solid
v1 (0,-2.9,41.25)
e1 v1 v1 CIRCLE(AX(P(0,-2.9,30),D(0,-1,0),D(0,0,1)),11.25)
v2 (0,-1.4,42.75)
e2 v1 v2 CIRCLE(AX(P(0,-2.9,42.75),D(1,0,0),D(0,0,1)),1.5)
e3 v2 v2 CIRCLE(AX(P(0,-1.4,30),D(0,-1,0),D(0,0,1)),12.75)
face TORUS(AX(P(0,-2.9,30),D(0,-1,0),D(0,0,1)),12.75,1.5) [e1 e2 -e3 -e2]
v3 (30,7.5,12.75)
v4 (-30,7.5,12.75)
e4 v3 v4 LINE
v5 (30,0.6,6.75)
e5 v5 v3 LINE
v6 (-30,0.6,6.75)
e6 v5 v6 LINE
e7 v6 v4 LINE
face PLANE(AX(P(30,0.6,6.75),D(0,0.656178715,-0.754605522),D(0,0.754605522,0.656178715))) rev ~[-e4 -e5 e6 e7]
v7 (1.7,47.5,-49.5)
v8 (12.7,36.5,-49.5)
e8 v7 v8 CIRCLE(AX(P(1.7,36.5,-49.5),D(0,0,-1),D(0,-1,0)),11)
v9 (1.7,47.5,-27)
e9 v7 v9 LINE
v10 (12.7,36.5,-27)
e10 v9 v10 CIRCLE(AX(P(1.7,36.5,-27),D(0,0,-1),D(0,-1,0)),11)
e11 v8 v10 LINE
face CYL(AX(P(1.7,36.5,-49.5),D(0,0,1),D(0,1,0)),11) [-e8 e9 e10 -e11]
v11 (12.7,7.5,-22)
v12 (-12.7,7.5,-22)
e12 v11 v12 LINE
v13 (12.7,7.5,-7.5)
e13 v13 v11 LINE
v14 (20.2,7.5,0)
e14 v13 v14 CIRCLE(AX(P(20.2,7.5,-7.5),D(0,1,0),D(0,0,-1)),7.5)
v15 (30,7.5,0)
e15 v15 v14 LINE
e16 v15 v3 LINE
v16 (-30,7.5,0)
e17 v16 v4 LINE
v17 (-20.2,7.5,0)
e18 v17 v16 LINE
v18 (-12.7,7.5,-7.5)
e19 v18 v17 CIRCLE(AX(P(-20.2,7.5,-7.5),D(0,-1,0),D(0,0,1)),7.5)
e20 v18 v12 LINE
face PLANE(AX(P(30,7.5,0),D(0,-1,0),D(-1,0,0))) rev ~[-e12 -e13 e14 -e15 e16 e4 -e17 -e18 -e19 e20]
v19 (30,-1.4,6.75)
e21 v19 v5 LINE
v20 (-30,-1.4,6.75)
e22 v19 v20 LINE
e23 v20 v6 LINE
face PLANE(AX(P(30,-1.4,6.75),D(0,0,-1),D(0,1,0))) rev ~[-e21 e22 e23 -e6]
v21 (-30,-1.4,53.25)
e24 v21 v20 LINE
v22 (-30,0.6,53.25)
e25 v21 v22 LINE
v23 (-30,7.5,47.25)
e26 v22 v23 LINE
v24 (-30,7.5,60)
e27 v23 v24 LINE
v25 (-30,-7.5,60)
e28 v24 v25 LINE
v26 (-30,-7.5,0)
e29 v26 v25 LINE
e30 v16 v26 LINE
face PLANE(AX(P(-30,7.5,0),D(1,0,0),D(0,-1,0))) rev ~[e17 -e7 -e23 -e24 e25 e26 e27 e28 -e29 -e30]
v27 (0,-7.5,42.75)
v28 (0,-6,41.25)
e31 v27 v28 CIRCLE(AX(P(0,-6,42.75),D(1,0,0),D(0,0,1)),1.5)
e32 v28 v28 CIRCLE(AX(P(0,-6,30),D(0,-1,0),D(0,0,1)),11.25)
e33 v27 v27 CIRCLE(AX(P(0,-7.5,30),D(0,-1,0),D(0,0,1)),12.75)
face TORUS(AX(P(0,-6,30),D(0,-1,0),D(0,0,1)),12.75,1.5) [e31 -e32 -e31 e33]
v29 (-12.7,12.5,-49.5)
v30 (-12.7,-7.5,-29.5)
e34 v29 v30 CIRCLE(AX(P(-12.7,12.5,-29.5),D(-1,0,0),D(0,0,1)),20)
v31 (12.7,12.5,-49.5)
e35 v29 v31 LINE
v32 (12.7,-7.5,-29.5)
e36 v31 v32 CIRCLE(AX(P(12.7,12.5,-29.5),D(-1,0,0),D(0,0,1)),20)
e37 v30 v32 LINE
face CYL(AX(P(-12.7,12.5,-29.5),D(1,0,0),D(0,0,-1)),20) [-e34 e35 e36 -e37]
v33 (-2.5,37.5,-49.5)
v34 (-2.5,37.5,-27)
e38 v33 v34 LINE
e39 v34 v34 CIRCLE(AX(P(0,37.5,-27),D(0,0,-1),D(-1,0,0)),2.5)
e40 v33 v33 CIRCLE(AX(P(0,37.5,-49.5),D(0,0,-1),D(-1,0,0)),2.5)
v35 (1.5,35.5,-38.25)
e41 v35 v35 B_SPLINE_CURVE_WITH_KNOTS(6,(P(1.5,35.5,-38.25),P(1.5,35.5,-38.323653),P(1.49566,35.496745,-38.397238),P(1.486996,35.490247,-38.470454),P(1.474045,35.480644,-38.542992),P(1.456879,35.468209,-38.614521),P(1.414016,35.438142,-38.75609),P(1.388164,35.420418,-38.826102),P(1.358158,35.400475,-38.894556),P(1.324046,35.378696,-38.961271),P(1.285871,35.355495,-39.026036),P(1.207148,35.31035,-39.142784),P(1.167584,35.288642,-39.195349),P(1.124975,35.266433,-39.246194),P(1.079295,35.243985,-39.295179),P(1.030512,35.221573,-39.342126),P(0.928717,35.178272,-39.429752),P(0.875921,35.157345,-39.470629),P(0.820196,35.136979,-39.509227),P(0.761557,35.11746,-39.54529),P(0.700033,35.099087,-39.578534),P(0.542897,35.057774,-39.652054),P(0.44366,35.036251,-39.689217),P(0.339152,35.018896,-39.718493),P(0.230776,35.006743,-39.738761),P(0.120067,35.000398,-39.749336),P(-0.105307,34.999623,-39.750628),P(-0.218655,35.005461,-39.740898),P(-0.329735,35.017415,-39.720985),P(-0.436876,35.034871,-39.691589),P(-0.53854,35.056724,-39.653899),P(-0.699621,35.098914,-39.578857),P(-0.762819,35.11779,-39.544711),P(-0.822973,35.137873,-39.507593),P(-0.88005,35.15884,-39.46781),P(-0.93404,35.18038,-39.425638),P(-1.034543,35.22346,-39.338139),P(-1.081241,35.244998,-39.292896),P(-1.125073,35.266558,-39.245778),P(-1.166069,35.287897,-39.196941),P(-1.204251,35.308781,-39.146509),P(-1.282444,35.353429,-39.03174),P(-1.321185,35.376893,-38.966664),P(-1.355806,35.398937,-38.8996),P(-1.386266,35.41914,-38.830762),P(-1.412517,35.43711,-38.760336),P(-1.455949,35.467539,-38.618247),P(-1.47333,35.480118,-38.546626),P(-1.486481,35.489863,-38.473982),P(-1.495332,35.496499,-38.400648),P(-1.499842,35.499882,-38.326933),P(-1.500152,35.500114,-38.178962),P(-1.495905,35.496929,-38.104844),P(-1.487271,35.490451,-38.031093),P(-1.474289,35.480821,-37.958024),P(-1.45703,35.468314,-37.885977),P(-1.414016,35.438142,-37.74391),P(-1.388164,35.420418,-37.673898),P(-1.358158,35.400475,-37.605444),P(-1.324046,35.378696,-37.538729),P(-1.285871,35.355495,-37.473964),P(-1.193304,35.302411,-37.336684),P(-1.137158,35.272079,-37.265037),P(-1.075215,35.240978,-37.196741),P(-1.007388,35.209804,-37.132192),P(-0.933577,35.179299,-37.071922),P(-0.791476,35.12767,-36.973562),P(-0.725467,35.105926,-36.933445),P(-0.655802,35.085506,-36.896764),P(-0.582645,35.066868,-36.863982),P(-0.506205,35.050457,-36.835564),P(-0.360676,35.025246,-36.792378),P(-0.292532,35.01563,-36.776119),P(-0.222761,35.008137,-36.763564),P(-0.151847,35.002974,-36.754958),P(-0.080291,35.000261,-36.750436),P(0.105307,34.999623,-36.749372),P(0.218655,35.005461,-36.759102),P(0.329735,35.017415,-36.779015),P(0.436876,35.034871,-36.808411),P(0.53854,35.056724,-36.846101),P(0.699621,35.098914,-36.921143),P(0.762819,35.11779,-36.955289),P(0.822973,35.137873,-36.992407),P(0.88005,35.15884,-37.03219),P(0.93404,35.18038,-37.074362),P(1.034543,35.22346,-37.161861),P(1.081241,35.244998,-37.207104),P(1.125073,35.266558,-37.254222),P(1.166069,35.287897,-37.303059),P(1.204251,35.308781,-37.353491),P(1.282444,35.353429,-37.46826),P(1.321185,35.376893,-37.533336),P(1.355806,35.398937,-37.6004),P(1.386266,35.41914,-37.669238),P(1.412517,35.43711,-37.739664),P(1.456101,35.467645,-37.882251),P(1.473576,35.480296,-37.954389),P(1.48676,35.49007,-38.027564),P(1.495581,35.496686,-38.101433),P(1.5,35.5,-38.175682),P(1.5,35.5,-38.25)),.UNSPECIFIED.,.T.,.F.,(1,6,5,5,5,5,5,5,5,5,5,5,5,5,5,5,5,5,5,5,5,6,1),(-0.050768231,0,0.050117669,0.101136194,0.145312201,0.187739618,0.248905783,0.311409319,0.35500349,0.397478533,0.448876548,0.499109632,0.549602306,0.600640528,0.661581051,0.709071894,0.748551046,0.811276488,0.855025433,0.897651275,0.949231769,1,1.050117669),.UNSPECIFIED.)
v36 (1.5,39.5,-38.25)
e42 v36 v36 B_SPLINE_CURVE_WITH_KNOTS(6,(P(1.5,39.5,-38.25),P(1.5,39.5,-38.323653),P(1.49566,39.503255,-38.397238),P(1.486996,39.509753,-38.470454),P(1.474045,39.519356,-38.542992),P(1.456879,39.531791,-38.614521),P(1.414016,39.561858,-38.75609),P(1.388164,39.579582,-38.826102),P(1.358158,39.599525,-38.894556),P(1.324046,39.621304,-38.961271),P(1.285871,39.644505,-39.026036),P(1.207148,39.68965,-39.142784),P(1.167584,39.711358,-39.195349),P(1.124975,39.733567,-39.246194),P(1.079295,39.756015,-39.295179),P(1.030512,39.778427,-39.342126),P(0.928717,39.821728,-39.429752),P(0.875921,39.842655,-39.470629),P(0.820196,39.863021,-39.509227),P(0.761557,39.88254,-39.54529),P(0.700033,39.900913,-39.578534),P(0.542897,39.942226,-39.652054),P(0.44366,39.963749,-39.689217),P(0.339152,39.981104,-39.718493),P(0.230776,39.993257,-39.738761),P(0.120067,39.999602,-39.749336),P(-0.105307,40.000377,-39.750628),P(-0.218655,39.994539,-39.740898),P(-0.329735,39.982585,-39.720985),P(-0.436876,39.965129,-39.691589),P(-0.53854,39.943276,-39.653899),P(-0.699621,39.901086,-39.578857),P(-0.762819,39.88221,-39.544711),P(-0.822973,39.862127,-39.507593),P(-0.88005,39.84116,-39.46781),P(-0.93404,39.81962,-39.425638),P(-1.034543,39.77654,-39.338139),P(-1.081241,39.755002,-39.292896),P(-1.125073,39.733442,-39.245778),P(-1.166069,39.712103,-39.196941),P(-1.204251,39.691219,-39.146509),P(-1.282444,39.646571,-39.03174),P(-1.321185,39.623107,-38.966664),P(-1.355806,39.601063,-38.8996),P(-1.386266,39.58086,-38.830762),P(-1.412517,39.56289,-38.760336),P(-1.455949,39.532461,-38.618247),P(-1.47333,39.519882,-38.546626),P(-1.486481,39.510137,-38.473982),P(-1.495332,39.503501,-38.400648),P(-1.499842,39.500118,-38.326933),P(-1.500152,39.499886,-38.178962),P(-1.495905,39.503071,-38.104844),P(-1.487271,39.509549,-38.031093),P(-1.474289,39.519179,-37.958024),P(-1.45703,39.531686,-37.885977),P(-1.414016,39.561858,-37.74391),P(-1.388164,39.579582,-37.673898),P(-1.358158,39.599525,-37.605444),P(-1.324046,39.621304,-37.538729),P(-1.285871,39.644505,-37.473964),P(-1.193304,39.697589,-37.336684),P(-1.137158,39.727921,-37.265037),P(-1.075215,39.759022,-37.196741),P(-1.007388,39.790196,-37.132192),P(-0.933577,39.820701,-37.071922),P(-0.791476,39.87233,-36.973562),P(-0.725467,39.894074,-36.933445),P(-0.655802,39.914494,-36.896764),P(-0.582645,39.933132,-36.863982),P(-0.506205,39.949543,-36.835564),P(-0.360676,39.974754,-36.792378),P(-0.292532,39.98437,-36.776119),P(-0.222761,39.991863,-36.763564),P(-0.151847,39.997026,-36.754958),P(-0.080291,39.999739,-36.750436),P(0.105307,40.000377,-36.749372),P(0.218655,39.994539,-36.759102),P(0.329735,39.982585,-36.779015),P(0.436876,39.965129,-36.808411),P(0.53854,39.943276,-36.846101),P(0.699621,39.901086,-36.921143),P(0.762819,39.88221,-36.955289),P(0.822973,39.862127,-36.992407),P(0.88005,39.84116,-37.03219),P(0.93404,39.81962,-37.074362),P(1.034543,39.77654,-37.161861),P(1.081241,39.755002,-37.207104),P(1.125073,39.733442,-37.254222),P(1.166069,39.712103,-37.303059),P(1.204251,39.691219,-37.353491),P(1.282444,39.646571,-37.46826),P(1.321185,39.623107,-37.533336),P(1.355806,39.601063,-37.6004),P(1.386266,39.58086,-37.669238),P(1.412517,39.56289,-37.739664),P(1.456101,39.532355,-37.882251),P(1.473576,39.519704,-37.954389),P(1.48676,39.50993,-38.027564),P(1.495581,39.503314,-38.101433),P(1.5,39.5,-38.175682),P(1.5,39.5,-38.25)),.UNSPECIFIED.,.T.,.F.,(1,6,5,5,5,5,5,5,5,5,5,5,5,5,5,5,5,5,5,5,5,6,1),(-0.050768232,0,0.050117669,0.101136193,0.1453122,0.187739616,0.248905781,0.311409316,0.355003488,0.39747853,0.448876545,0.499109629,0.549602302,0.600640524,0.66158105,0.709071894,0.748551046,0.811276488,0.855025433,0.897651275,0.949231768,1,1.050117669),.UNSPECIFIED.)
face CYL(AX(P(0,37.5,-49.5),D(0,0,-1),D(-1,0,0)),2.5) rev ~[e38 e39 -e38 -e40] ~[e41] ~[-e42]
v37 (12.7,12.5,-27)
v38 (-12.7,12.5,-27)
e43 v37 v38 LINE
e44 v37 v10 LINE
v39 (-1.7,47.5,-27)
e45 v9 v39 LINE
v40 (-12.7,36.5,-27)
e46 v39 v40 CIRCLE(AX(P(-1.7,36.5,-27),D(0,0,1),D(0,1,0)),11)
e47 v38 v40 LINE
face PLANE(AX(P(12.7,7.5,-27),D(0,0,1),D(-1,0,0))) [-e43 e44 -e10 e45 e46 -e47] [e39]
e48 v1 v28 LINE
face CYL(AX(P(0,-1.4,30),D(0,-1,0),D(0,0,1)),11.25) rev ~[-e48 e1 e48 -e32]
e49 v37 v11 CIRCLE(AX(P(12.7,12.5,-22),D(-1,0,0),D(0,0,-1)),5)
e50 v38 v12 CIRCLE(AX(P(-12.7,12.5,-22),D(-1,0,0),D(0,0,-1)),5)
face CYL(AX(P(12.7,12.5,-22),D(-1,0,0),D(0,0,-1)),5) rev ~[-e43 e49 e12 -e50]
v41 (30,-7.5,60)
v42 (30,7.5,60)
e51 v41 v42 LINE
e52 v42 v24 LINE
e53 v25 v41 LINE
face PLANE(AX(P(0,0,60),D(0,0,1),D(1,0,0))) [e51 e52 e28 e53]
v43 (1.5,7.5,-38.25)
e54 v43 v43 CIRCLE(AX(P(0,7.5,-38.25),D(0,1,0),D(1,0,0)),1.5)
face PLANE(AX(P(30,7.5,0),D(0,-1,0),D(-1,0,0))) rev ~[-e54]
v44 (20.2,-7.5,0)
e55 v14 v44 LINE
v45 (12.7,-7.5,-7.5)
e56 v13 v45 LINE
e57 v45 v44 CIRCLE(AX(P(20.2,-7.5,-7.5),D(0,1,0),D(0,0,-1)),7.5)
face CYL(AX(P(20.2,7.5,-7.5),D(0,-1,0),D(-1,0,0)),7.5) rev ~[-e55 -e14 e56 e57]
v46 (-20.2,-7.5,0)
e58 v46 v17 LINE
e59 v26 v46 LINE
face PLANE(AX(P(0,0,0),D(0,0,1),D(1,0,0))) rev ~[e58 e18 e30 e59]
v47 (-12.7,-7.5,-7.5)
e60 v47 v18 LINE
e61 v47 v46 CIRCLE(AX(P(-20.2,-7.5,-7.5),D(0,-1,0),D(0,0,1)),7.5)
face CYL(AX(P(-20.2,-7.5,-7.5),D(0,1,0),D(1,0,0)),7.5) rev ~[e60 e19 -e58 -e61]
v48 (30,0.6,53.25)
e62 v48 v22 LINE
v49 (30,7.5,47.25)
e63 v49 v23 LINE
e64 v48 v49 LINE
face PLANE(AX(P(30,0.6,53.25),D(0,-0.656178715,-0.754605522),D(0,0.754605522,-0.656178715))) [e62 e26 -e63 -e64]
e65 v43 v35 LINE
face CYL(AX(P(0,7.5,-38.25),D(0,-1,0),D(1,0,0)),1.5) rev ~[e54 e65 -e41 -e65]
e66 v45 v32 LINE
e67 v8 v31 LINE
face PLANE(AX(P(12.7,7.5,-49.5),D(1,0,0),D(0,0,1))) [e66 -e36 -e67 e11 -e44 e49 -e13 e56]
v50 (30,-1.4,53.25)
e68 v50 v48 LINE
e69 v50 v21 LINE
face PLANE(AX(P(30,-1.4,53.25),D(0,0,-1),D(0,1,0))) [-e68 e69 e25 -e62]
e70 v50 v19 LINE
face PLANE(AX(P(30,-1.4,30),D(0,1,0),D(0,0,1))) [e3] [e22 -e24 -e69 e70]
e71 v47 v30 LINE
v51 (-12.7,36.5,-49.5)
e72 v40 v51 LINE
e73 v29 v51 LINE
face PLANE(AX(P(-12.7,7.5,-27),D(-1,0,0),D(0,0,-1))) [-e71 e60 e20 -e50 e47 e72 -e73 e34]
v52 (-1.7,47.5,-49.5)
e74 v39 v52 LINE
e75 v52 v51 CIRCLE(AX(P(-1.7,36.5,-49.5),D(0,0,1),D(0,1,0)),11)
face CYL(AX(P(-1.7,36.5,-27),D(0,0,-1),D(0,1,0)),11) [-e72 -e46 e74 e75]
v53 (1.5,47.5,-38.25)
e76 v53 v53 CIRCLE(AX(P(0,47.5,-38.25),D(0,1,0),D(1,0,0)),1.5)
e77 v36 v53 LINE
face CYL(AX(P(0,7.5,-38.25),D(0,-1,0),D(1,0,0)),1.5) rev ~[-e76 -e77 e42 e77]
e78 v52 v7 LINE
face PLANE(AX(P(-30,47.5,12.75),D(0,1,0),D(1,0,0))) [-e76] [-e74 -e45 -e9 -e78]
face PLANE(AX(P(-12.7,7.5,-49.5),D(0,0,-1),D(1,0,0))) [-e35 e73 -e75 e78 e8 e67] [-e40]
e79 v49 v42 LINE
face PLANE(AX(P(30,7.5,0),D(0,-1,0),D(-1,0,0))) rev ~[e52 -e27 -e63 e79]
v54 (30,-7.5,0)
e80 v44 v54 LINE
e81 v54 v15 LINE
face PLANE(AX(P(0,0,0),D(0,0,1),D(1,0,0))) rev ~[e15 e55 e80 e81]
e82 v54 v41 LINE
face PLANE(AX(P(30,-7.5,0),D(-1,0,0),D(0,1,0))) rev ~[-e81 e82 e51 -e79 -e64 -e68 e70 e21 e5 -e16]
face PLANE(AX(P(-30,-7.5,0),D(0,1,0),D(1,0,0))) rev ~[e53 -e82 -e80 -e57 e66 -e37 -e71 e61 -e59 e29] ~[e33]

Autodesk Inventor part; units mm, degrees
ref_plane "YZ Plane" through (0, 0, 0) normal (1, 0, 0) x (0, 1, 0)
ref_plane "XZ Plane" through (0, 0, 0) normal (0, 1, 0) x (-1, 0, 0)
ref_plane "XY Plane" through (0, 0, 0) normal (0, 0, 1) x (1, 0, 0)
sketch "Sketch1" plane through (0, 0, 0) normal (0, 0, 1) x (1, 0, 0)
  line L0 (-30, -7.5) -> (30, -7.5)
  line L1 (30, -7.5) -> (30, 7.5)
  line L2 (30, 7.5) -> (-30, 7.5)
  line L3 (-30, 7.5) -> (-30, -7.5)
  line L4 (-30, -7.5) -> (30, 7.5) construction
  line L5 (30, -7.5) -> (-30, 7.5) construction
  line L6 (30, 7.5) -> (25, 7.5) construction
  line L7 (-30, 7.5) -> (-25, 7.5) construction
  point P0 (0, 0)
  dimension "d0" = 60
  dimension "d1" = 15
extrude "Block" add sketch "Sketch1" along normal blind 60
sketch "Sketch2" plane through (30, -7.5, 0) normal (1, 0, 0) x (0, 0, -1)
  line L0 (0, 15) -> (-60, 15) projected
  line L1 (-30, 15) -> (-12.75, 15)
  line L2 (-30, 15) -> (-47.25, 15)
  line L3 (-30, 15) -> (-30, 6.1) construction
  line L4 (-30, 6.1) -> (-6.75, 6.1)
  line L5 (-30, 6.1) -> (-53.25, 6.1)
  line L6 (-53.25, 6.1) -> (-53.25, 8.1)
  line L7 (-6.75, 6.1) -> (-6.75, 8.1)
  line L8 (-6.75, 8.1) -> (-12.75, 15)
  line L9 (-53.25, 8.1) -> (-47.25, 15)
  point P0 (0, 7.5)
  dimension "d17" = 17.25
  dimension "d18" = 17.25
  dimension "d19" = 8.9
  dimension "d20" = 23.25
  dimension "d21" = 23.25
  dimension "d22" = 2
  dimension "d23" = 2
extrude "Tripod Slot" cut sketch "Sketch2" against normal blind 60
hole "Hole1" at (0, -1.4, 30) direction (0, -1, 0) diameter 22.5 end through all
sketch "Sketch4" plane through (0, 0, 0) normal (0, 0, -1) x (-1, 0, 0)
  line L0 (-30, 7.5) -> (30, 7.5) projected
  line L1 (12.7, 7.5) -> (-12.7, 7.5)
  line L2 (-12.7, 7.5) -> (-12.7, -7.5)
  line L3 (30, -7.5) -> (-30, -7.5) projected
  line L4 (-12.7, -7.5) -> (12.7, -7.5)
  line L5 (12.7, -7.5) -> (12.7, 7.5)
  point P0 (0, 1.5)
  dimension "d64" = 25.4
  dimension "d96" = 17.3
  dimension "d97" = 9
  dimension "d98" = 12.7
extrude "Extrusion4" add sketch "Sketch4" along normal blind 49.5
sketch "Sketch5" plane through (-30, 7.5, 12.75) normal (0, 1, 0) x (1, 0, 0)
  line L0 (60, -34.5) -> (60, 0) projected
  line L1 (17.3, 62.25) -> (42.7, 62.25) projected
  line L2 (17.3, 62.25) -> (42.7, 62.25)
  line L3 (42.7, 62.25) -> (42.7, 39.75)
  line L4 (42.7, 39.75) -> (17.3, 39.75)
  line L5 (17.3, 39.75) -> (17.3, 62.25)
  line L6 (42.7, 39.75) -> (17.3, 62.25) construction
  circle A0 centre (30, 51) radius 1.5
  point P0 (30, 12.75)
  dimension "d67" = 22.5
  dimension "d68" = 3
  dimension "d99" = 131.535
extrude "Extrusion5" add sketch "Sketch5" along normal blind 40
sketch "Sketch6" plane through (0, 0, -49.5) normal (0, 0, -1) x (-1, 0, 0)
  line L0 (0, 0) -> (0, 47.5) construction
  circle A0 centre (0, 37.5) radius 2.5
  line L1 (-12.7, 47.5) -> (12.7, 47.5) construction
  line L2 (-12.7, 47.5) -> (12.7, 47.5) construction
  line L3 (12.7, 47.5) -> (0, 47.5) construction
  line L4 (0, 37.5) -> (0, 47.5) construction
  dimension "d60" = 5
  dimension "d61" = 10
extrude "Extrusion6" cut sketch "Sketch6" against normal blind 31.75
fillet "Fillet4" radius 11 2 edges at (12.7, 47.5, -38.25) (-12.7, 47.5, -38.25)
fillet "Fillet5" radius 20 1 edges at (0, -7.5, -49.5)
fillet "Fillet6" radius 5 1 edges at (0, 7.5, -27)
fillet "Fillet10" radius 7.5 2 edges at (12.7, 0, 0) (-12.7, 0, 0)
fillet "Fillet11" radius 1.5 2 edges at (0, -7.5, 18.75) (0, -1.4, 18.75)
properties part number "InnerFrame"
